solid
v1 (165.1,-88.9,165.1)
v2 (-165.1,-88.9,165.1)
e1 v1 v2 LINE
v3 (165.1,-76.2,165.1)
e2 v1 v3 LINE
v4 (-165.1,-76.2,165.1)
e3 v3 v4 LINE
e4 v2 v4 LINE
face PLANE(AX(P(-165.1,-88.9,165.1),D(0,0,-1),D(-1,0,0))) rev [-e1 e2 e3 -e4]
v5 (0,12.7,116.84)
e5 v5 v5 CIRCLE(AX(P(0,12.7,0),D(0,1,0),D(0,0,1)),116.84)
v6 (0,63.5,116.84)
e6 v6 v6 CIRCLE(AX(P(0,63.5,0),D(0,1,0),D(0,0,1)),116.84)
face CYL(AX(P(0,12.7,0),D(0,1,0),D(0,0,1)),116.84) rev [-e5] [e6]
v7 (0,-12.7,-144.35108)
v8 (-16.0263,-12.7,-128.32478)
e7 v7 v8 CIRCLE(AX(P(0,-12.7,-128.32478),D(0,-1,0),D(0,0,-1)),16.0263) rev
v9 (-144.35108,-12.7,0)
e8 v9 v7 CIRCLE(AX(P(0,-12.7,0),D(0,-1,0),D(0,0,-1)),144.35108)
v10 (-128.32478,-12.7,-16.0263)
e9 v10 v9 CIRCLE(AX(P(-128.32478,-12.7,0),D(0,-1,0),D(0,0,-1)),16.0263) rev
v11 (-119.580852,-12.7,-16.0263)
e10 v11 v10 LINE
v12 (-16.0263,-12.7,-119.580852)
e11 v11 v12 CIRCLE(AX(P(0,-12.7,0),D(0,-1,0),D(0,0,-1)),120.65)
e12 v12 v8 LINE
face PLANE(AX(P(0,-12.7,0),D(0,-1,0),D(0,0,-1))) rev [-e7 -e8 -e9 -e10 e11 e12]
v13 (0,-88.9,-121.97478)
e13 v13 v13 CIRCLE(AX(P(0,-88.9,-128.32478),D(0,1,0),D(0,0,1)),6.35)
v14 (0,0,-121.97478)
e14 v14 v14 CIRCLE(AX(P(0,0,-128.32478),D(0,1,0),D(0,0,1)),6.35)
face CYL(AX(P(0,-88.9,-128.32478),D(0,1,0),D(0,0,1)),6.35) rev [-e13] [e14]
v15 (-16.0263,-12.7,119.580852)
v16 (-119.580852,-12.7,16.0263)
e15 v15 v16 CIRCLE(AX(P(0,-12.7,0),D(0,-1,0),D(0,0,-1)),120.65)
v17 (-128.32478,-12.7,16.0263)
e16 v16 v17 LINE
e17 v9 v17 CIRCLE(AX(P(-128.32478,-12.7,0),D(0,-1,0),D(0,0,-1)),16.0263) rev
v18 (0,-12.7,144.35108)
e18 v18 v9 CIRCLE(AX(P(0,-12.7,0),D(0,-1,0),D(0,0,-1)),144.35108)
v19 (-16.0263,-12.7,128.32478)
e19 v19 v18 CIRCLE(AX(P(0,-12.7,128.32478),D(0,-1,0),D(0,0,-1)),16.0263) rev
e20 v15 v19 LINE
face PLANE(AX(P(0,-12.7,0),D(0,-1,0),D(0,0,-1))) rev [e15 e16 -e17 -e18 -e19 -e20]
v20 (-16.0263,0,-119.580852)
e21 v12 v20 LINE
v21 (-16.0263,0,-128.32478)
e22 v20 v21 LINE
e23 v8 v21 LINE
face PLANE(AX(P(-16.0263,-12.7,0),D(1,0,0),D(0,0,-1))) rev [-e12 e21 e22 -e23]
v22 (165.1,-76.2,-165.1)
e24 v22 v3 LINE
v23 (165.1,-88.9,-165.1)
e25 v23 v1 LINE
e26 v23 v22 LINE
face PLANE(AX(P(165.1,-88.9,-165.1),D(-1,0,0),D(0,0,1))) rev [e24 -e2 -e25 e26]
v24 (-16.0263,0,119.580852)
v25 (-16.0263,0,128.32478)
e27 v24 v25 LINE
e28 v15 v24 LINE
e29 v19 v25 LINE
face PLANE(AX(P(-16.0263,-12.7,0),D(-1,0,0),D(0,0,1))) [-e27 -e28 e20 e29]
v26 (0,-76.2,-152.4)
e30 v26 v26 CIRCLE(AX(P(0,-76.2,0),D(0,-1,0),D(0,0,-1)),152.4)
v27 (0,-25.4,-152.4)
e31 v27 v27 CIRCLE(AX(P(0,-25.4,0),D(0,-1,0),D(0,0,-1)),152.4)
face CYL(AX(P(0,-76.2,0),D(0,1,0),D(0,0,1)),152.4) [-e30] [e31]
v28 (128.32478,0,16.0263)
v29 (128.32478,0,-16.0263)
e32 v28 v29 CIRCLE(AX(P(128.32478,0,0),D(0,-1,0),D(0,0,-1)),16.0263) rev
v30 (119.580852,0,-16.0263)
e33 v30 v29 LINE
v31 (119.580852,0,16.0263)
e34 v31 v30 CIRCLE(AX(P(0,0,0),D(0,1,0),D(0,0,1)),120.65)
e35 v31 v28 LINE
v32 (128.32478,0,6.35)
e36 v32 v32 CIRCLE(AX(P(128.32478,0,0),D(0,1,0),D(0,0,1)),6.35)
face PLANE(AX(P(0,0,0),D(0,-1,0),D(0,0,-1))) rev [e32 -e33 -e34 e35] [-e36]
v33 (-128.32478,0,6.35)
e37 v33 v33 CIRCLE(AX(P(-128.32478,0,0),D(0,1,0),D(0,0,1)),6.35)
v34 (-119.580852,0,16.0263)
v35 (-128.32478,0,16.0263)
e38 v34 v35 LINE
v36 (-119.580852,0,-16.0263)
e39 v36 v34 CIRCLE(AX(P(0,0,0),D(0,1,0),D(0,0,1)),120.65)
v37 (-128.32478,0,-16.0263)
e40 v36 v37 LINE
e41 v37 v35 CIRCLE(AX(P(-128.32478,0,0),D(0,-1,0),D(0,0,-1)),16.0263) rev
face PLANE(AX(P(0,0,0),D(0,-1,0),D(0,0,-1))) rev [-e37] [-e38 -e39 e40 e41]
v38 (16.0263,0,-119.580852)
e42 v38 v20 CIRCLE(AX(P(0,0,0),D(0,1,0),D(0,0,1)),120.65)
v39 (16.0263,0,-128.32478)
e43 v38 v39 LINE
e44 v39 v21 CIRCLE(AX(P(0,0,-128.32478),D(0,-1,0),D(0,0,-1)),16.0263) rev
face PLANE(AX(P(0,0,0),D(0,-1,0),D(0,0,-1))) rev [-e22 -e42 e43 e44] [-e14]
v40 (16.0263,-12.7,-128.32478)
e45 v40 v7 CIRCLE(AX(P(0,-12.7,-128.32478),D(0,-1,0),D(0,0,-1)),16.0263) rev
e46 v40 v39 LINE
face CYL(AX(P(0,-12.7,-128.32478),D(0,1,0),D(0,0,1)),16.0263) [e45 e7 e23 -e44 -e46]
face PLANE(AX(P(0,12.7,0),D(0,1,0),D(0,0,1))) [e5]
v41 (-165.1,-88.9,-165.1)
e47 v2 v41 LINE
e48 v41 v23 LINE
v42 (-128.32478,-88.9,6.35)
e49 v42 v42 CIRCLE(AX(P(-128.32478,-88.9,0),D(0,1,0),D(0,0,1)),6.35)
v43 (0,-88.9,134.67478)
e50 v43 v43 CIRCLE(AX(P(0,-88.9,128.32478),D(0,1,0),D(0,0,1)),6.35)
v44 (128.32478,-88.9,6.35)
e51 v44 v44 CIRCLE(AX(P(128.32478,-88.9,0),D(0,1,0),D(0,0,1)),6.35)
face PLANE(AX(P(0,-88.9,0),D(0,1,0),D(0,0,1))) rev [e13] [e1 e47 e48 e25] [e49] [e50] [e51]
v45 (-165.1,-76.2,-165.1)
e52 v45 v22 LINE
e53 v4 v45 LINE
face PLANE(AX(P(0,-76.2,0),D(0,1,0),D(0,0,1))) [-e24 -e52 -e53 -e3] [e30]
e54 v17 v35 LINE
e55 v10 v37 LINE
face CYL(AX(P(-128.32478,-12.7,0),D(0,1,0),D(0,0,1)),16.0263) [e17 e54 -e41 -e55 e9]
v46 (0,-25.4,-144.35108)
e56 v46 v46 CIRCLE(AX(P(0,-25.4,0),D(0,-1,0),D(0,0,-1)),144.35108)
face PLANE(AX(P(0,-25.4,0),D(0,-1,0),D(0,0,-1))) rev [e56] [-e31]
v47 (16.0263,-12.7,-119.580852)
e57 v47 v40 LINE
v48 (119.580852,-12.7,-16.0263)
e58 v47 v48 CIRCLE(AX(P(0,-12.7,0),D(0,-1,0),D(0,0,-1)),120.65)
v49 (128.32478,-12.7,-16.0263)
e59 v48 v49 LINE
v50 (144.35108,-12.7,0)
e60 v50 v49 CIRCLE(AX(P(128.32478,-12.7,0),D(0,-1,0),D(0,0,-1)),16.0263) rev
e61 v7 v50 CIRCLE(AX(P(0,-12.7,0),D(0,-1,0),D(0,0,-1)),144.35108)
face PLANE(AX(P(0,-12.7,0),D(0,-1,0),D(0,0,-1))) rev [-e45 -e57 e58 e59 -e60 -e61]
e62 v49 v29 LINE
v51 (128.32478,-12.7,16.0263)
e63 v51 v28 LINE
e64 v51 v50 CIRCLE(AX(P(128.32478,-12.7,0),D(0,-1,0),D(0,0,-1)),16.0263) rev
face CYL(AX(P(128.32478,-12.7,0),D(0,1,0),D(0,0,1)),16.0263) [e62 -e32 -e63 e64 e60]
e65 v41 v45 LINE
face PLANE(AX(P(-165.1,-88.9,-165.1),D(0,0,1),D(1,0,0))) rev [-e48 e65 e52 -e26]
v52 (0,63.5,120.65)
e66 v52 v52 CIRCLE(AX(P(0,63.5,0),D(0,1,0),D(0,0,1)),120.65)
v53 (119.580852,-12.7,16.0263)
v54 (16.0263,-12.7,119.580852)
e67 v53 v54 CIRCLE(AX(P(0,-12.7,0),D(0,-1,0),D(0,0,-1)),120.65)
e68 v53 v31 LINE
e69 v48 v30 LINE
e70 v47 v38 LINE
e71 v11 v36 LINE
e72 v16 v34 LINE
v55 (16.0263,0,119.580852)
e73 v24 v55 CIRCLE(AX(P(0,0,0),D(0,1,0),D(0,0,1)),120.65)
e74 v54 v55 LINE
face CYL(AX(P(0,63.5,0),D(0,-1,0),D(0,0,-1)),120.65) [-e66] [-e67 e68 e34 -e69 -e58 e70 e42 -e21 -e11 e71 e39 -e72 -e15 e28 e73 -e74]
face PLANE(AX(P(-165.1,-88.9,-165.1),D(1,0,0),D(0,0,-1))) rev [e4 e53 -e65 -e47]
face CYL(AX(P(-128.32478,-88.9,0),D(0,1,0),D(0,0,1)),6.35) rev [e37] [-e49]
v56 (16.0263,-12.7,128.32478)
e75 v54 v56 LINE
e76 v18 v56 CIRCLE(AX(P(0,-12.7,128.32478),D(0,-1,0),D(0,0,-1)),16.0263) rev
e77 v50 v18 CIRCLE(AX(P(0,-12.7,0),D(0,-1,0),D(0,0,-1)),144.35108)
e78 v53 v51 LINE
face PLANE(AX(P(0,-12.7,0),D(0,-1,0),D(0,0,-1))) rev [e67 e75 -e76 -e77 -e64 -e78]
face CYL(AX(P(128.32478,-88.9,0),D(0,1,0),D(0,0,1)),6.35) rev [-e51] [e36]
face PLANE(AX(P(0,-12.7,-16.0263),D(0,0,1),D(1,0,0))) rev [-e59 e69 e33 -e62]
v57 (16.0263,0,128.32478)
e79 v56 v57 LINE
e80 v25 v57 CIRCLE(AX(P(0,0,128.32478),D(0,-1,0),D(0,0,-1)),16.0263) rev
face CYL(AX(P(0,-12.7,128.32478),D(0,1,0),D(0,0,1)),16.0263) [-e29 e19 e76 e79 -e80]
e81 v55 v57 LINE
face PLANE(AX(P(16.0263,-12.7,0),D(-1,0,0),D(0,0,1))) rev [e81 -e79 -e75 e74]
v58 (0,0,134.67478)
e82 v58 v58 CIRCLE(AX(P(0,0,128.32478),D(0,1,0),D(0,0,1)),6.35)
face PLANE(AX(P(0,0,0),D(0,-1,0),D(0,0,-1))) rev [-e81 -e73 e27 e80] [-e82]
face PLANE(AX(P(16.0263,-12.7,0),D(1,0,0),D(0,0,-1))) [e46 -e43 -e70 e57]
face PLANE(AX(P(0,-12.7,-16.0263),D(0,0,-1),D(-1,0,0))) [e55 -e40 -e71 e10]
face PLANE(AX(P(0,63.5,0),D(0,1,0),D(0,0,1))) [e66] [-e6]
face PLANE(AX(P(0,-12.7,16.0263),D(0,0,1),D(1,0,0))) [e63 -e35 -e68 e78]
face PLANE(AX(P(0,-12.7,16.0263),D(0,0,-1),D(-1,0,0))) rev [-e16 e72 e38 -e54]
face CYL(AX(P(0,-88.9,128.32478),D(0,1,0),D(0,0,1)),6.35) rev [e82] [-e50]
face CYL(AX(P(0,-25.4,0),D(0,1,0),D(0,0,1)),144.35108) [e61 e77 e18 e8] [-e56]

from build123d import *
from build123d.topology import SkipClean

# Parameters (mm, degrees)
SKETCH1_R           = 120.65
BOSS_EXTRUDE1_DEPTH = 63.5
SKETCH2_R           = 116.84
CUT_EXTRUDE1_DEPTH  = 50.8
BOSS_EXTRUDE3_START = 12.7
BOSS_EXTRUDE3_DEPTH = 12.7
SKETCH5_R           = 144.351080184
BOSS_EXTRUDE4_DEPTH = 12.7
SKETCH6_R           = 152.4
BOSS_EXTRUDE5_DEPTH = 50.8
SKETCH8_W           = 330.2
SKETCH8_H           = 330.2
BOSS_EXTRUDE6_DEPTH = 12.7
SKETCH7_R           = 6.35
CUT_EXTRUDE2_DEPTH  = 250.838407776


with BuildPart() as part:
    # Sketch1 → Boss-Extrude1 (new body)
    with BuildSketch(Plane(origin=(0, 0, 0), x_dir=(1, 0, 0), z_dir=(0, 1, 0))):
        Circle(SKETCH1_R)
    extrude(amount=BOSS_EXTRUDE1_DEPTH)

    # Sketch2 → Cut-Extrude1 (cut)
    with BuildSketch(Plane(origin=(0, 63.5, 0), x_dir=(1, 0, 0), z_dir=(0, 1, 0))):
        Circle(SKETCH2_R)
    extrude(amount=-CUT_EXTRUDE1_DEPTH, mode=Mode.SUBTRACT)

    # Sketch4 → Boss-Extrude3 (add)
    with SkipClean():  # the faces are left unmerged after this step: merging them gives an invalid solid
        with BuildSketch(Plane.XZ.offset(BOSS_EXTRUDE3_START)):
            with BuildLine():
                Line((-16.026299781, 128.324780403), (-16.026299781, 119.58085221))
                ThreePointArc((-16.026299781, 119.58085221), (-85.31243315, 85.31243315), (-119.58085221, 16.026299781))
                Line((-119.58085221, 16.026299781), (-128.324780403, 16.026299781))
                ThreePointArc((-128.324780403, 16.026299781), (-144.351080184, 0), (-128.324780403, -16.026299781))
                Line((-128.324780403, -16.026299781), (-119.58085221, -16.026299781))
                ThreePointArc((-119.58085221, -16.026299781), (-85.31243315, -85.31243315), (-16.026299781, -119.58085221))
                Line((-16.026299781, -119.58085221), (-16.026299781, -128.324780403))
                ThreePointArc((-16.026299781, -128.324780403), (0, -144.351080184), (16.026299781, -128.324780403))
                Line((16.026299781, -128.324780403), (16.026299781, -119.58085221))
                ThreePointArc((16.026299781, -119.58085221), (85.31243315, -85.31243315), (119.58085221, -16.026299781))
                Line((119.58085221, -16.026299781), (128.324780403, -16.026299781))
                ThreePointArc((128.324780403, -16.026299781), (144.351080184, 0), (128.324780403, 16.026299781))
                Line((128.324780403, 16.026299781), (119.58085221, 16.026299781))
                ThreePointArc((119.58085221, 16.026299781), (85.31243315, 85.31243315), (16.026299781, 119.58085221))
                Line((16.026299781, 119.58085221), (16.026299781, 128.324780403))
                ThreePointArc((16.026299781, 128.324780403), (0, 144.351080184), (-16.026299781, 128.324780403))
            make_face()
        extrude(amount=-BOSS_EXTRUDE3_DEPTH)

    # Sketch5 → Boss-Extrude4 (add)
    with SkipClean():  # the faces are left unmerged after this step: merging them gives an invalid solid
        with BuildSketch(Plane.XZ.offset(12.7)):
            Circle(SKETCH5_R)
        extrude(amount=BOSS_EXTRUDE4_DEPTH)

    # Sketch6 → Boss-Extrude5 (add)
    with BuildSketch(Plane.XZ.offset(25.4)):
        Circle(SKETCH6_R)
    extrude(amount=BOSS_EXTRUDE5_DEPTH)

    # Sketch8 → Boss-Extrude6 (add)
    with BuildSketch(Plane.XZ.offset(76.2)):
        Rectangle(SKETCH8_W, SKETCH8_H)
    extrude(amount=BOSS_EXTRUDE6_DEPTH)

    # Sketch7 → Cut-Extrude2 (cut, through all)
    with SkipClean():  # the faces are left unmerged after this step: merging them gives an invalid solid
        with BuildSketch(Plane(origin=(0, 0, 0), x_dir=(1, 0, 0), z_dir=(0, 1, 0))):
            with Locations((0, 128.324780403)):
                Circle(SKETCH7_R)
            with Locations((-128.324780403, 0)):
                Circle(SKETCH7_R)
            with Locations((0, -128.324780403)):
                Circle(SKETCH7_R)
            with Locations((128.324780403, 0)):
                Circle(SKETCH7_R)
        extrude(amount=-CUT_EXTRUDE2_DEPTH, mode=Mode.SUBTRACT)


solid = part.part
